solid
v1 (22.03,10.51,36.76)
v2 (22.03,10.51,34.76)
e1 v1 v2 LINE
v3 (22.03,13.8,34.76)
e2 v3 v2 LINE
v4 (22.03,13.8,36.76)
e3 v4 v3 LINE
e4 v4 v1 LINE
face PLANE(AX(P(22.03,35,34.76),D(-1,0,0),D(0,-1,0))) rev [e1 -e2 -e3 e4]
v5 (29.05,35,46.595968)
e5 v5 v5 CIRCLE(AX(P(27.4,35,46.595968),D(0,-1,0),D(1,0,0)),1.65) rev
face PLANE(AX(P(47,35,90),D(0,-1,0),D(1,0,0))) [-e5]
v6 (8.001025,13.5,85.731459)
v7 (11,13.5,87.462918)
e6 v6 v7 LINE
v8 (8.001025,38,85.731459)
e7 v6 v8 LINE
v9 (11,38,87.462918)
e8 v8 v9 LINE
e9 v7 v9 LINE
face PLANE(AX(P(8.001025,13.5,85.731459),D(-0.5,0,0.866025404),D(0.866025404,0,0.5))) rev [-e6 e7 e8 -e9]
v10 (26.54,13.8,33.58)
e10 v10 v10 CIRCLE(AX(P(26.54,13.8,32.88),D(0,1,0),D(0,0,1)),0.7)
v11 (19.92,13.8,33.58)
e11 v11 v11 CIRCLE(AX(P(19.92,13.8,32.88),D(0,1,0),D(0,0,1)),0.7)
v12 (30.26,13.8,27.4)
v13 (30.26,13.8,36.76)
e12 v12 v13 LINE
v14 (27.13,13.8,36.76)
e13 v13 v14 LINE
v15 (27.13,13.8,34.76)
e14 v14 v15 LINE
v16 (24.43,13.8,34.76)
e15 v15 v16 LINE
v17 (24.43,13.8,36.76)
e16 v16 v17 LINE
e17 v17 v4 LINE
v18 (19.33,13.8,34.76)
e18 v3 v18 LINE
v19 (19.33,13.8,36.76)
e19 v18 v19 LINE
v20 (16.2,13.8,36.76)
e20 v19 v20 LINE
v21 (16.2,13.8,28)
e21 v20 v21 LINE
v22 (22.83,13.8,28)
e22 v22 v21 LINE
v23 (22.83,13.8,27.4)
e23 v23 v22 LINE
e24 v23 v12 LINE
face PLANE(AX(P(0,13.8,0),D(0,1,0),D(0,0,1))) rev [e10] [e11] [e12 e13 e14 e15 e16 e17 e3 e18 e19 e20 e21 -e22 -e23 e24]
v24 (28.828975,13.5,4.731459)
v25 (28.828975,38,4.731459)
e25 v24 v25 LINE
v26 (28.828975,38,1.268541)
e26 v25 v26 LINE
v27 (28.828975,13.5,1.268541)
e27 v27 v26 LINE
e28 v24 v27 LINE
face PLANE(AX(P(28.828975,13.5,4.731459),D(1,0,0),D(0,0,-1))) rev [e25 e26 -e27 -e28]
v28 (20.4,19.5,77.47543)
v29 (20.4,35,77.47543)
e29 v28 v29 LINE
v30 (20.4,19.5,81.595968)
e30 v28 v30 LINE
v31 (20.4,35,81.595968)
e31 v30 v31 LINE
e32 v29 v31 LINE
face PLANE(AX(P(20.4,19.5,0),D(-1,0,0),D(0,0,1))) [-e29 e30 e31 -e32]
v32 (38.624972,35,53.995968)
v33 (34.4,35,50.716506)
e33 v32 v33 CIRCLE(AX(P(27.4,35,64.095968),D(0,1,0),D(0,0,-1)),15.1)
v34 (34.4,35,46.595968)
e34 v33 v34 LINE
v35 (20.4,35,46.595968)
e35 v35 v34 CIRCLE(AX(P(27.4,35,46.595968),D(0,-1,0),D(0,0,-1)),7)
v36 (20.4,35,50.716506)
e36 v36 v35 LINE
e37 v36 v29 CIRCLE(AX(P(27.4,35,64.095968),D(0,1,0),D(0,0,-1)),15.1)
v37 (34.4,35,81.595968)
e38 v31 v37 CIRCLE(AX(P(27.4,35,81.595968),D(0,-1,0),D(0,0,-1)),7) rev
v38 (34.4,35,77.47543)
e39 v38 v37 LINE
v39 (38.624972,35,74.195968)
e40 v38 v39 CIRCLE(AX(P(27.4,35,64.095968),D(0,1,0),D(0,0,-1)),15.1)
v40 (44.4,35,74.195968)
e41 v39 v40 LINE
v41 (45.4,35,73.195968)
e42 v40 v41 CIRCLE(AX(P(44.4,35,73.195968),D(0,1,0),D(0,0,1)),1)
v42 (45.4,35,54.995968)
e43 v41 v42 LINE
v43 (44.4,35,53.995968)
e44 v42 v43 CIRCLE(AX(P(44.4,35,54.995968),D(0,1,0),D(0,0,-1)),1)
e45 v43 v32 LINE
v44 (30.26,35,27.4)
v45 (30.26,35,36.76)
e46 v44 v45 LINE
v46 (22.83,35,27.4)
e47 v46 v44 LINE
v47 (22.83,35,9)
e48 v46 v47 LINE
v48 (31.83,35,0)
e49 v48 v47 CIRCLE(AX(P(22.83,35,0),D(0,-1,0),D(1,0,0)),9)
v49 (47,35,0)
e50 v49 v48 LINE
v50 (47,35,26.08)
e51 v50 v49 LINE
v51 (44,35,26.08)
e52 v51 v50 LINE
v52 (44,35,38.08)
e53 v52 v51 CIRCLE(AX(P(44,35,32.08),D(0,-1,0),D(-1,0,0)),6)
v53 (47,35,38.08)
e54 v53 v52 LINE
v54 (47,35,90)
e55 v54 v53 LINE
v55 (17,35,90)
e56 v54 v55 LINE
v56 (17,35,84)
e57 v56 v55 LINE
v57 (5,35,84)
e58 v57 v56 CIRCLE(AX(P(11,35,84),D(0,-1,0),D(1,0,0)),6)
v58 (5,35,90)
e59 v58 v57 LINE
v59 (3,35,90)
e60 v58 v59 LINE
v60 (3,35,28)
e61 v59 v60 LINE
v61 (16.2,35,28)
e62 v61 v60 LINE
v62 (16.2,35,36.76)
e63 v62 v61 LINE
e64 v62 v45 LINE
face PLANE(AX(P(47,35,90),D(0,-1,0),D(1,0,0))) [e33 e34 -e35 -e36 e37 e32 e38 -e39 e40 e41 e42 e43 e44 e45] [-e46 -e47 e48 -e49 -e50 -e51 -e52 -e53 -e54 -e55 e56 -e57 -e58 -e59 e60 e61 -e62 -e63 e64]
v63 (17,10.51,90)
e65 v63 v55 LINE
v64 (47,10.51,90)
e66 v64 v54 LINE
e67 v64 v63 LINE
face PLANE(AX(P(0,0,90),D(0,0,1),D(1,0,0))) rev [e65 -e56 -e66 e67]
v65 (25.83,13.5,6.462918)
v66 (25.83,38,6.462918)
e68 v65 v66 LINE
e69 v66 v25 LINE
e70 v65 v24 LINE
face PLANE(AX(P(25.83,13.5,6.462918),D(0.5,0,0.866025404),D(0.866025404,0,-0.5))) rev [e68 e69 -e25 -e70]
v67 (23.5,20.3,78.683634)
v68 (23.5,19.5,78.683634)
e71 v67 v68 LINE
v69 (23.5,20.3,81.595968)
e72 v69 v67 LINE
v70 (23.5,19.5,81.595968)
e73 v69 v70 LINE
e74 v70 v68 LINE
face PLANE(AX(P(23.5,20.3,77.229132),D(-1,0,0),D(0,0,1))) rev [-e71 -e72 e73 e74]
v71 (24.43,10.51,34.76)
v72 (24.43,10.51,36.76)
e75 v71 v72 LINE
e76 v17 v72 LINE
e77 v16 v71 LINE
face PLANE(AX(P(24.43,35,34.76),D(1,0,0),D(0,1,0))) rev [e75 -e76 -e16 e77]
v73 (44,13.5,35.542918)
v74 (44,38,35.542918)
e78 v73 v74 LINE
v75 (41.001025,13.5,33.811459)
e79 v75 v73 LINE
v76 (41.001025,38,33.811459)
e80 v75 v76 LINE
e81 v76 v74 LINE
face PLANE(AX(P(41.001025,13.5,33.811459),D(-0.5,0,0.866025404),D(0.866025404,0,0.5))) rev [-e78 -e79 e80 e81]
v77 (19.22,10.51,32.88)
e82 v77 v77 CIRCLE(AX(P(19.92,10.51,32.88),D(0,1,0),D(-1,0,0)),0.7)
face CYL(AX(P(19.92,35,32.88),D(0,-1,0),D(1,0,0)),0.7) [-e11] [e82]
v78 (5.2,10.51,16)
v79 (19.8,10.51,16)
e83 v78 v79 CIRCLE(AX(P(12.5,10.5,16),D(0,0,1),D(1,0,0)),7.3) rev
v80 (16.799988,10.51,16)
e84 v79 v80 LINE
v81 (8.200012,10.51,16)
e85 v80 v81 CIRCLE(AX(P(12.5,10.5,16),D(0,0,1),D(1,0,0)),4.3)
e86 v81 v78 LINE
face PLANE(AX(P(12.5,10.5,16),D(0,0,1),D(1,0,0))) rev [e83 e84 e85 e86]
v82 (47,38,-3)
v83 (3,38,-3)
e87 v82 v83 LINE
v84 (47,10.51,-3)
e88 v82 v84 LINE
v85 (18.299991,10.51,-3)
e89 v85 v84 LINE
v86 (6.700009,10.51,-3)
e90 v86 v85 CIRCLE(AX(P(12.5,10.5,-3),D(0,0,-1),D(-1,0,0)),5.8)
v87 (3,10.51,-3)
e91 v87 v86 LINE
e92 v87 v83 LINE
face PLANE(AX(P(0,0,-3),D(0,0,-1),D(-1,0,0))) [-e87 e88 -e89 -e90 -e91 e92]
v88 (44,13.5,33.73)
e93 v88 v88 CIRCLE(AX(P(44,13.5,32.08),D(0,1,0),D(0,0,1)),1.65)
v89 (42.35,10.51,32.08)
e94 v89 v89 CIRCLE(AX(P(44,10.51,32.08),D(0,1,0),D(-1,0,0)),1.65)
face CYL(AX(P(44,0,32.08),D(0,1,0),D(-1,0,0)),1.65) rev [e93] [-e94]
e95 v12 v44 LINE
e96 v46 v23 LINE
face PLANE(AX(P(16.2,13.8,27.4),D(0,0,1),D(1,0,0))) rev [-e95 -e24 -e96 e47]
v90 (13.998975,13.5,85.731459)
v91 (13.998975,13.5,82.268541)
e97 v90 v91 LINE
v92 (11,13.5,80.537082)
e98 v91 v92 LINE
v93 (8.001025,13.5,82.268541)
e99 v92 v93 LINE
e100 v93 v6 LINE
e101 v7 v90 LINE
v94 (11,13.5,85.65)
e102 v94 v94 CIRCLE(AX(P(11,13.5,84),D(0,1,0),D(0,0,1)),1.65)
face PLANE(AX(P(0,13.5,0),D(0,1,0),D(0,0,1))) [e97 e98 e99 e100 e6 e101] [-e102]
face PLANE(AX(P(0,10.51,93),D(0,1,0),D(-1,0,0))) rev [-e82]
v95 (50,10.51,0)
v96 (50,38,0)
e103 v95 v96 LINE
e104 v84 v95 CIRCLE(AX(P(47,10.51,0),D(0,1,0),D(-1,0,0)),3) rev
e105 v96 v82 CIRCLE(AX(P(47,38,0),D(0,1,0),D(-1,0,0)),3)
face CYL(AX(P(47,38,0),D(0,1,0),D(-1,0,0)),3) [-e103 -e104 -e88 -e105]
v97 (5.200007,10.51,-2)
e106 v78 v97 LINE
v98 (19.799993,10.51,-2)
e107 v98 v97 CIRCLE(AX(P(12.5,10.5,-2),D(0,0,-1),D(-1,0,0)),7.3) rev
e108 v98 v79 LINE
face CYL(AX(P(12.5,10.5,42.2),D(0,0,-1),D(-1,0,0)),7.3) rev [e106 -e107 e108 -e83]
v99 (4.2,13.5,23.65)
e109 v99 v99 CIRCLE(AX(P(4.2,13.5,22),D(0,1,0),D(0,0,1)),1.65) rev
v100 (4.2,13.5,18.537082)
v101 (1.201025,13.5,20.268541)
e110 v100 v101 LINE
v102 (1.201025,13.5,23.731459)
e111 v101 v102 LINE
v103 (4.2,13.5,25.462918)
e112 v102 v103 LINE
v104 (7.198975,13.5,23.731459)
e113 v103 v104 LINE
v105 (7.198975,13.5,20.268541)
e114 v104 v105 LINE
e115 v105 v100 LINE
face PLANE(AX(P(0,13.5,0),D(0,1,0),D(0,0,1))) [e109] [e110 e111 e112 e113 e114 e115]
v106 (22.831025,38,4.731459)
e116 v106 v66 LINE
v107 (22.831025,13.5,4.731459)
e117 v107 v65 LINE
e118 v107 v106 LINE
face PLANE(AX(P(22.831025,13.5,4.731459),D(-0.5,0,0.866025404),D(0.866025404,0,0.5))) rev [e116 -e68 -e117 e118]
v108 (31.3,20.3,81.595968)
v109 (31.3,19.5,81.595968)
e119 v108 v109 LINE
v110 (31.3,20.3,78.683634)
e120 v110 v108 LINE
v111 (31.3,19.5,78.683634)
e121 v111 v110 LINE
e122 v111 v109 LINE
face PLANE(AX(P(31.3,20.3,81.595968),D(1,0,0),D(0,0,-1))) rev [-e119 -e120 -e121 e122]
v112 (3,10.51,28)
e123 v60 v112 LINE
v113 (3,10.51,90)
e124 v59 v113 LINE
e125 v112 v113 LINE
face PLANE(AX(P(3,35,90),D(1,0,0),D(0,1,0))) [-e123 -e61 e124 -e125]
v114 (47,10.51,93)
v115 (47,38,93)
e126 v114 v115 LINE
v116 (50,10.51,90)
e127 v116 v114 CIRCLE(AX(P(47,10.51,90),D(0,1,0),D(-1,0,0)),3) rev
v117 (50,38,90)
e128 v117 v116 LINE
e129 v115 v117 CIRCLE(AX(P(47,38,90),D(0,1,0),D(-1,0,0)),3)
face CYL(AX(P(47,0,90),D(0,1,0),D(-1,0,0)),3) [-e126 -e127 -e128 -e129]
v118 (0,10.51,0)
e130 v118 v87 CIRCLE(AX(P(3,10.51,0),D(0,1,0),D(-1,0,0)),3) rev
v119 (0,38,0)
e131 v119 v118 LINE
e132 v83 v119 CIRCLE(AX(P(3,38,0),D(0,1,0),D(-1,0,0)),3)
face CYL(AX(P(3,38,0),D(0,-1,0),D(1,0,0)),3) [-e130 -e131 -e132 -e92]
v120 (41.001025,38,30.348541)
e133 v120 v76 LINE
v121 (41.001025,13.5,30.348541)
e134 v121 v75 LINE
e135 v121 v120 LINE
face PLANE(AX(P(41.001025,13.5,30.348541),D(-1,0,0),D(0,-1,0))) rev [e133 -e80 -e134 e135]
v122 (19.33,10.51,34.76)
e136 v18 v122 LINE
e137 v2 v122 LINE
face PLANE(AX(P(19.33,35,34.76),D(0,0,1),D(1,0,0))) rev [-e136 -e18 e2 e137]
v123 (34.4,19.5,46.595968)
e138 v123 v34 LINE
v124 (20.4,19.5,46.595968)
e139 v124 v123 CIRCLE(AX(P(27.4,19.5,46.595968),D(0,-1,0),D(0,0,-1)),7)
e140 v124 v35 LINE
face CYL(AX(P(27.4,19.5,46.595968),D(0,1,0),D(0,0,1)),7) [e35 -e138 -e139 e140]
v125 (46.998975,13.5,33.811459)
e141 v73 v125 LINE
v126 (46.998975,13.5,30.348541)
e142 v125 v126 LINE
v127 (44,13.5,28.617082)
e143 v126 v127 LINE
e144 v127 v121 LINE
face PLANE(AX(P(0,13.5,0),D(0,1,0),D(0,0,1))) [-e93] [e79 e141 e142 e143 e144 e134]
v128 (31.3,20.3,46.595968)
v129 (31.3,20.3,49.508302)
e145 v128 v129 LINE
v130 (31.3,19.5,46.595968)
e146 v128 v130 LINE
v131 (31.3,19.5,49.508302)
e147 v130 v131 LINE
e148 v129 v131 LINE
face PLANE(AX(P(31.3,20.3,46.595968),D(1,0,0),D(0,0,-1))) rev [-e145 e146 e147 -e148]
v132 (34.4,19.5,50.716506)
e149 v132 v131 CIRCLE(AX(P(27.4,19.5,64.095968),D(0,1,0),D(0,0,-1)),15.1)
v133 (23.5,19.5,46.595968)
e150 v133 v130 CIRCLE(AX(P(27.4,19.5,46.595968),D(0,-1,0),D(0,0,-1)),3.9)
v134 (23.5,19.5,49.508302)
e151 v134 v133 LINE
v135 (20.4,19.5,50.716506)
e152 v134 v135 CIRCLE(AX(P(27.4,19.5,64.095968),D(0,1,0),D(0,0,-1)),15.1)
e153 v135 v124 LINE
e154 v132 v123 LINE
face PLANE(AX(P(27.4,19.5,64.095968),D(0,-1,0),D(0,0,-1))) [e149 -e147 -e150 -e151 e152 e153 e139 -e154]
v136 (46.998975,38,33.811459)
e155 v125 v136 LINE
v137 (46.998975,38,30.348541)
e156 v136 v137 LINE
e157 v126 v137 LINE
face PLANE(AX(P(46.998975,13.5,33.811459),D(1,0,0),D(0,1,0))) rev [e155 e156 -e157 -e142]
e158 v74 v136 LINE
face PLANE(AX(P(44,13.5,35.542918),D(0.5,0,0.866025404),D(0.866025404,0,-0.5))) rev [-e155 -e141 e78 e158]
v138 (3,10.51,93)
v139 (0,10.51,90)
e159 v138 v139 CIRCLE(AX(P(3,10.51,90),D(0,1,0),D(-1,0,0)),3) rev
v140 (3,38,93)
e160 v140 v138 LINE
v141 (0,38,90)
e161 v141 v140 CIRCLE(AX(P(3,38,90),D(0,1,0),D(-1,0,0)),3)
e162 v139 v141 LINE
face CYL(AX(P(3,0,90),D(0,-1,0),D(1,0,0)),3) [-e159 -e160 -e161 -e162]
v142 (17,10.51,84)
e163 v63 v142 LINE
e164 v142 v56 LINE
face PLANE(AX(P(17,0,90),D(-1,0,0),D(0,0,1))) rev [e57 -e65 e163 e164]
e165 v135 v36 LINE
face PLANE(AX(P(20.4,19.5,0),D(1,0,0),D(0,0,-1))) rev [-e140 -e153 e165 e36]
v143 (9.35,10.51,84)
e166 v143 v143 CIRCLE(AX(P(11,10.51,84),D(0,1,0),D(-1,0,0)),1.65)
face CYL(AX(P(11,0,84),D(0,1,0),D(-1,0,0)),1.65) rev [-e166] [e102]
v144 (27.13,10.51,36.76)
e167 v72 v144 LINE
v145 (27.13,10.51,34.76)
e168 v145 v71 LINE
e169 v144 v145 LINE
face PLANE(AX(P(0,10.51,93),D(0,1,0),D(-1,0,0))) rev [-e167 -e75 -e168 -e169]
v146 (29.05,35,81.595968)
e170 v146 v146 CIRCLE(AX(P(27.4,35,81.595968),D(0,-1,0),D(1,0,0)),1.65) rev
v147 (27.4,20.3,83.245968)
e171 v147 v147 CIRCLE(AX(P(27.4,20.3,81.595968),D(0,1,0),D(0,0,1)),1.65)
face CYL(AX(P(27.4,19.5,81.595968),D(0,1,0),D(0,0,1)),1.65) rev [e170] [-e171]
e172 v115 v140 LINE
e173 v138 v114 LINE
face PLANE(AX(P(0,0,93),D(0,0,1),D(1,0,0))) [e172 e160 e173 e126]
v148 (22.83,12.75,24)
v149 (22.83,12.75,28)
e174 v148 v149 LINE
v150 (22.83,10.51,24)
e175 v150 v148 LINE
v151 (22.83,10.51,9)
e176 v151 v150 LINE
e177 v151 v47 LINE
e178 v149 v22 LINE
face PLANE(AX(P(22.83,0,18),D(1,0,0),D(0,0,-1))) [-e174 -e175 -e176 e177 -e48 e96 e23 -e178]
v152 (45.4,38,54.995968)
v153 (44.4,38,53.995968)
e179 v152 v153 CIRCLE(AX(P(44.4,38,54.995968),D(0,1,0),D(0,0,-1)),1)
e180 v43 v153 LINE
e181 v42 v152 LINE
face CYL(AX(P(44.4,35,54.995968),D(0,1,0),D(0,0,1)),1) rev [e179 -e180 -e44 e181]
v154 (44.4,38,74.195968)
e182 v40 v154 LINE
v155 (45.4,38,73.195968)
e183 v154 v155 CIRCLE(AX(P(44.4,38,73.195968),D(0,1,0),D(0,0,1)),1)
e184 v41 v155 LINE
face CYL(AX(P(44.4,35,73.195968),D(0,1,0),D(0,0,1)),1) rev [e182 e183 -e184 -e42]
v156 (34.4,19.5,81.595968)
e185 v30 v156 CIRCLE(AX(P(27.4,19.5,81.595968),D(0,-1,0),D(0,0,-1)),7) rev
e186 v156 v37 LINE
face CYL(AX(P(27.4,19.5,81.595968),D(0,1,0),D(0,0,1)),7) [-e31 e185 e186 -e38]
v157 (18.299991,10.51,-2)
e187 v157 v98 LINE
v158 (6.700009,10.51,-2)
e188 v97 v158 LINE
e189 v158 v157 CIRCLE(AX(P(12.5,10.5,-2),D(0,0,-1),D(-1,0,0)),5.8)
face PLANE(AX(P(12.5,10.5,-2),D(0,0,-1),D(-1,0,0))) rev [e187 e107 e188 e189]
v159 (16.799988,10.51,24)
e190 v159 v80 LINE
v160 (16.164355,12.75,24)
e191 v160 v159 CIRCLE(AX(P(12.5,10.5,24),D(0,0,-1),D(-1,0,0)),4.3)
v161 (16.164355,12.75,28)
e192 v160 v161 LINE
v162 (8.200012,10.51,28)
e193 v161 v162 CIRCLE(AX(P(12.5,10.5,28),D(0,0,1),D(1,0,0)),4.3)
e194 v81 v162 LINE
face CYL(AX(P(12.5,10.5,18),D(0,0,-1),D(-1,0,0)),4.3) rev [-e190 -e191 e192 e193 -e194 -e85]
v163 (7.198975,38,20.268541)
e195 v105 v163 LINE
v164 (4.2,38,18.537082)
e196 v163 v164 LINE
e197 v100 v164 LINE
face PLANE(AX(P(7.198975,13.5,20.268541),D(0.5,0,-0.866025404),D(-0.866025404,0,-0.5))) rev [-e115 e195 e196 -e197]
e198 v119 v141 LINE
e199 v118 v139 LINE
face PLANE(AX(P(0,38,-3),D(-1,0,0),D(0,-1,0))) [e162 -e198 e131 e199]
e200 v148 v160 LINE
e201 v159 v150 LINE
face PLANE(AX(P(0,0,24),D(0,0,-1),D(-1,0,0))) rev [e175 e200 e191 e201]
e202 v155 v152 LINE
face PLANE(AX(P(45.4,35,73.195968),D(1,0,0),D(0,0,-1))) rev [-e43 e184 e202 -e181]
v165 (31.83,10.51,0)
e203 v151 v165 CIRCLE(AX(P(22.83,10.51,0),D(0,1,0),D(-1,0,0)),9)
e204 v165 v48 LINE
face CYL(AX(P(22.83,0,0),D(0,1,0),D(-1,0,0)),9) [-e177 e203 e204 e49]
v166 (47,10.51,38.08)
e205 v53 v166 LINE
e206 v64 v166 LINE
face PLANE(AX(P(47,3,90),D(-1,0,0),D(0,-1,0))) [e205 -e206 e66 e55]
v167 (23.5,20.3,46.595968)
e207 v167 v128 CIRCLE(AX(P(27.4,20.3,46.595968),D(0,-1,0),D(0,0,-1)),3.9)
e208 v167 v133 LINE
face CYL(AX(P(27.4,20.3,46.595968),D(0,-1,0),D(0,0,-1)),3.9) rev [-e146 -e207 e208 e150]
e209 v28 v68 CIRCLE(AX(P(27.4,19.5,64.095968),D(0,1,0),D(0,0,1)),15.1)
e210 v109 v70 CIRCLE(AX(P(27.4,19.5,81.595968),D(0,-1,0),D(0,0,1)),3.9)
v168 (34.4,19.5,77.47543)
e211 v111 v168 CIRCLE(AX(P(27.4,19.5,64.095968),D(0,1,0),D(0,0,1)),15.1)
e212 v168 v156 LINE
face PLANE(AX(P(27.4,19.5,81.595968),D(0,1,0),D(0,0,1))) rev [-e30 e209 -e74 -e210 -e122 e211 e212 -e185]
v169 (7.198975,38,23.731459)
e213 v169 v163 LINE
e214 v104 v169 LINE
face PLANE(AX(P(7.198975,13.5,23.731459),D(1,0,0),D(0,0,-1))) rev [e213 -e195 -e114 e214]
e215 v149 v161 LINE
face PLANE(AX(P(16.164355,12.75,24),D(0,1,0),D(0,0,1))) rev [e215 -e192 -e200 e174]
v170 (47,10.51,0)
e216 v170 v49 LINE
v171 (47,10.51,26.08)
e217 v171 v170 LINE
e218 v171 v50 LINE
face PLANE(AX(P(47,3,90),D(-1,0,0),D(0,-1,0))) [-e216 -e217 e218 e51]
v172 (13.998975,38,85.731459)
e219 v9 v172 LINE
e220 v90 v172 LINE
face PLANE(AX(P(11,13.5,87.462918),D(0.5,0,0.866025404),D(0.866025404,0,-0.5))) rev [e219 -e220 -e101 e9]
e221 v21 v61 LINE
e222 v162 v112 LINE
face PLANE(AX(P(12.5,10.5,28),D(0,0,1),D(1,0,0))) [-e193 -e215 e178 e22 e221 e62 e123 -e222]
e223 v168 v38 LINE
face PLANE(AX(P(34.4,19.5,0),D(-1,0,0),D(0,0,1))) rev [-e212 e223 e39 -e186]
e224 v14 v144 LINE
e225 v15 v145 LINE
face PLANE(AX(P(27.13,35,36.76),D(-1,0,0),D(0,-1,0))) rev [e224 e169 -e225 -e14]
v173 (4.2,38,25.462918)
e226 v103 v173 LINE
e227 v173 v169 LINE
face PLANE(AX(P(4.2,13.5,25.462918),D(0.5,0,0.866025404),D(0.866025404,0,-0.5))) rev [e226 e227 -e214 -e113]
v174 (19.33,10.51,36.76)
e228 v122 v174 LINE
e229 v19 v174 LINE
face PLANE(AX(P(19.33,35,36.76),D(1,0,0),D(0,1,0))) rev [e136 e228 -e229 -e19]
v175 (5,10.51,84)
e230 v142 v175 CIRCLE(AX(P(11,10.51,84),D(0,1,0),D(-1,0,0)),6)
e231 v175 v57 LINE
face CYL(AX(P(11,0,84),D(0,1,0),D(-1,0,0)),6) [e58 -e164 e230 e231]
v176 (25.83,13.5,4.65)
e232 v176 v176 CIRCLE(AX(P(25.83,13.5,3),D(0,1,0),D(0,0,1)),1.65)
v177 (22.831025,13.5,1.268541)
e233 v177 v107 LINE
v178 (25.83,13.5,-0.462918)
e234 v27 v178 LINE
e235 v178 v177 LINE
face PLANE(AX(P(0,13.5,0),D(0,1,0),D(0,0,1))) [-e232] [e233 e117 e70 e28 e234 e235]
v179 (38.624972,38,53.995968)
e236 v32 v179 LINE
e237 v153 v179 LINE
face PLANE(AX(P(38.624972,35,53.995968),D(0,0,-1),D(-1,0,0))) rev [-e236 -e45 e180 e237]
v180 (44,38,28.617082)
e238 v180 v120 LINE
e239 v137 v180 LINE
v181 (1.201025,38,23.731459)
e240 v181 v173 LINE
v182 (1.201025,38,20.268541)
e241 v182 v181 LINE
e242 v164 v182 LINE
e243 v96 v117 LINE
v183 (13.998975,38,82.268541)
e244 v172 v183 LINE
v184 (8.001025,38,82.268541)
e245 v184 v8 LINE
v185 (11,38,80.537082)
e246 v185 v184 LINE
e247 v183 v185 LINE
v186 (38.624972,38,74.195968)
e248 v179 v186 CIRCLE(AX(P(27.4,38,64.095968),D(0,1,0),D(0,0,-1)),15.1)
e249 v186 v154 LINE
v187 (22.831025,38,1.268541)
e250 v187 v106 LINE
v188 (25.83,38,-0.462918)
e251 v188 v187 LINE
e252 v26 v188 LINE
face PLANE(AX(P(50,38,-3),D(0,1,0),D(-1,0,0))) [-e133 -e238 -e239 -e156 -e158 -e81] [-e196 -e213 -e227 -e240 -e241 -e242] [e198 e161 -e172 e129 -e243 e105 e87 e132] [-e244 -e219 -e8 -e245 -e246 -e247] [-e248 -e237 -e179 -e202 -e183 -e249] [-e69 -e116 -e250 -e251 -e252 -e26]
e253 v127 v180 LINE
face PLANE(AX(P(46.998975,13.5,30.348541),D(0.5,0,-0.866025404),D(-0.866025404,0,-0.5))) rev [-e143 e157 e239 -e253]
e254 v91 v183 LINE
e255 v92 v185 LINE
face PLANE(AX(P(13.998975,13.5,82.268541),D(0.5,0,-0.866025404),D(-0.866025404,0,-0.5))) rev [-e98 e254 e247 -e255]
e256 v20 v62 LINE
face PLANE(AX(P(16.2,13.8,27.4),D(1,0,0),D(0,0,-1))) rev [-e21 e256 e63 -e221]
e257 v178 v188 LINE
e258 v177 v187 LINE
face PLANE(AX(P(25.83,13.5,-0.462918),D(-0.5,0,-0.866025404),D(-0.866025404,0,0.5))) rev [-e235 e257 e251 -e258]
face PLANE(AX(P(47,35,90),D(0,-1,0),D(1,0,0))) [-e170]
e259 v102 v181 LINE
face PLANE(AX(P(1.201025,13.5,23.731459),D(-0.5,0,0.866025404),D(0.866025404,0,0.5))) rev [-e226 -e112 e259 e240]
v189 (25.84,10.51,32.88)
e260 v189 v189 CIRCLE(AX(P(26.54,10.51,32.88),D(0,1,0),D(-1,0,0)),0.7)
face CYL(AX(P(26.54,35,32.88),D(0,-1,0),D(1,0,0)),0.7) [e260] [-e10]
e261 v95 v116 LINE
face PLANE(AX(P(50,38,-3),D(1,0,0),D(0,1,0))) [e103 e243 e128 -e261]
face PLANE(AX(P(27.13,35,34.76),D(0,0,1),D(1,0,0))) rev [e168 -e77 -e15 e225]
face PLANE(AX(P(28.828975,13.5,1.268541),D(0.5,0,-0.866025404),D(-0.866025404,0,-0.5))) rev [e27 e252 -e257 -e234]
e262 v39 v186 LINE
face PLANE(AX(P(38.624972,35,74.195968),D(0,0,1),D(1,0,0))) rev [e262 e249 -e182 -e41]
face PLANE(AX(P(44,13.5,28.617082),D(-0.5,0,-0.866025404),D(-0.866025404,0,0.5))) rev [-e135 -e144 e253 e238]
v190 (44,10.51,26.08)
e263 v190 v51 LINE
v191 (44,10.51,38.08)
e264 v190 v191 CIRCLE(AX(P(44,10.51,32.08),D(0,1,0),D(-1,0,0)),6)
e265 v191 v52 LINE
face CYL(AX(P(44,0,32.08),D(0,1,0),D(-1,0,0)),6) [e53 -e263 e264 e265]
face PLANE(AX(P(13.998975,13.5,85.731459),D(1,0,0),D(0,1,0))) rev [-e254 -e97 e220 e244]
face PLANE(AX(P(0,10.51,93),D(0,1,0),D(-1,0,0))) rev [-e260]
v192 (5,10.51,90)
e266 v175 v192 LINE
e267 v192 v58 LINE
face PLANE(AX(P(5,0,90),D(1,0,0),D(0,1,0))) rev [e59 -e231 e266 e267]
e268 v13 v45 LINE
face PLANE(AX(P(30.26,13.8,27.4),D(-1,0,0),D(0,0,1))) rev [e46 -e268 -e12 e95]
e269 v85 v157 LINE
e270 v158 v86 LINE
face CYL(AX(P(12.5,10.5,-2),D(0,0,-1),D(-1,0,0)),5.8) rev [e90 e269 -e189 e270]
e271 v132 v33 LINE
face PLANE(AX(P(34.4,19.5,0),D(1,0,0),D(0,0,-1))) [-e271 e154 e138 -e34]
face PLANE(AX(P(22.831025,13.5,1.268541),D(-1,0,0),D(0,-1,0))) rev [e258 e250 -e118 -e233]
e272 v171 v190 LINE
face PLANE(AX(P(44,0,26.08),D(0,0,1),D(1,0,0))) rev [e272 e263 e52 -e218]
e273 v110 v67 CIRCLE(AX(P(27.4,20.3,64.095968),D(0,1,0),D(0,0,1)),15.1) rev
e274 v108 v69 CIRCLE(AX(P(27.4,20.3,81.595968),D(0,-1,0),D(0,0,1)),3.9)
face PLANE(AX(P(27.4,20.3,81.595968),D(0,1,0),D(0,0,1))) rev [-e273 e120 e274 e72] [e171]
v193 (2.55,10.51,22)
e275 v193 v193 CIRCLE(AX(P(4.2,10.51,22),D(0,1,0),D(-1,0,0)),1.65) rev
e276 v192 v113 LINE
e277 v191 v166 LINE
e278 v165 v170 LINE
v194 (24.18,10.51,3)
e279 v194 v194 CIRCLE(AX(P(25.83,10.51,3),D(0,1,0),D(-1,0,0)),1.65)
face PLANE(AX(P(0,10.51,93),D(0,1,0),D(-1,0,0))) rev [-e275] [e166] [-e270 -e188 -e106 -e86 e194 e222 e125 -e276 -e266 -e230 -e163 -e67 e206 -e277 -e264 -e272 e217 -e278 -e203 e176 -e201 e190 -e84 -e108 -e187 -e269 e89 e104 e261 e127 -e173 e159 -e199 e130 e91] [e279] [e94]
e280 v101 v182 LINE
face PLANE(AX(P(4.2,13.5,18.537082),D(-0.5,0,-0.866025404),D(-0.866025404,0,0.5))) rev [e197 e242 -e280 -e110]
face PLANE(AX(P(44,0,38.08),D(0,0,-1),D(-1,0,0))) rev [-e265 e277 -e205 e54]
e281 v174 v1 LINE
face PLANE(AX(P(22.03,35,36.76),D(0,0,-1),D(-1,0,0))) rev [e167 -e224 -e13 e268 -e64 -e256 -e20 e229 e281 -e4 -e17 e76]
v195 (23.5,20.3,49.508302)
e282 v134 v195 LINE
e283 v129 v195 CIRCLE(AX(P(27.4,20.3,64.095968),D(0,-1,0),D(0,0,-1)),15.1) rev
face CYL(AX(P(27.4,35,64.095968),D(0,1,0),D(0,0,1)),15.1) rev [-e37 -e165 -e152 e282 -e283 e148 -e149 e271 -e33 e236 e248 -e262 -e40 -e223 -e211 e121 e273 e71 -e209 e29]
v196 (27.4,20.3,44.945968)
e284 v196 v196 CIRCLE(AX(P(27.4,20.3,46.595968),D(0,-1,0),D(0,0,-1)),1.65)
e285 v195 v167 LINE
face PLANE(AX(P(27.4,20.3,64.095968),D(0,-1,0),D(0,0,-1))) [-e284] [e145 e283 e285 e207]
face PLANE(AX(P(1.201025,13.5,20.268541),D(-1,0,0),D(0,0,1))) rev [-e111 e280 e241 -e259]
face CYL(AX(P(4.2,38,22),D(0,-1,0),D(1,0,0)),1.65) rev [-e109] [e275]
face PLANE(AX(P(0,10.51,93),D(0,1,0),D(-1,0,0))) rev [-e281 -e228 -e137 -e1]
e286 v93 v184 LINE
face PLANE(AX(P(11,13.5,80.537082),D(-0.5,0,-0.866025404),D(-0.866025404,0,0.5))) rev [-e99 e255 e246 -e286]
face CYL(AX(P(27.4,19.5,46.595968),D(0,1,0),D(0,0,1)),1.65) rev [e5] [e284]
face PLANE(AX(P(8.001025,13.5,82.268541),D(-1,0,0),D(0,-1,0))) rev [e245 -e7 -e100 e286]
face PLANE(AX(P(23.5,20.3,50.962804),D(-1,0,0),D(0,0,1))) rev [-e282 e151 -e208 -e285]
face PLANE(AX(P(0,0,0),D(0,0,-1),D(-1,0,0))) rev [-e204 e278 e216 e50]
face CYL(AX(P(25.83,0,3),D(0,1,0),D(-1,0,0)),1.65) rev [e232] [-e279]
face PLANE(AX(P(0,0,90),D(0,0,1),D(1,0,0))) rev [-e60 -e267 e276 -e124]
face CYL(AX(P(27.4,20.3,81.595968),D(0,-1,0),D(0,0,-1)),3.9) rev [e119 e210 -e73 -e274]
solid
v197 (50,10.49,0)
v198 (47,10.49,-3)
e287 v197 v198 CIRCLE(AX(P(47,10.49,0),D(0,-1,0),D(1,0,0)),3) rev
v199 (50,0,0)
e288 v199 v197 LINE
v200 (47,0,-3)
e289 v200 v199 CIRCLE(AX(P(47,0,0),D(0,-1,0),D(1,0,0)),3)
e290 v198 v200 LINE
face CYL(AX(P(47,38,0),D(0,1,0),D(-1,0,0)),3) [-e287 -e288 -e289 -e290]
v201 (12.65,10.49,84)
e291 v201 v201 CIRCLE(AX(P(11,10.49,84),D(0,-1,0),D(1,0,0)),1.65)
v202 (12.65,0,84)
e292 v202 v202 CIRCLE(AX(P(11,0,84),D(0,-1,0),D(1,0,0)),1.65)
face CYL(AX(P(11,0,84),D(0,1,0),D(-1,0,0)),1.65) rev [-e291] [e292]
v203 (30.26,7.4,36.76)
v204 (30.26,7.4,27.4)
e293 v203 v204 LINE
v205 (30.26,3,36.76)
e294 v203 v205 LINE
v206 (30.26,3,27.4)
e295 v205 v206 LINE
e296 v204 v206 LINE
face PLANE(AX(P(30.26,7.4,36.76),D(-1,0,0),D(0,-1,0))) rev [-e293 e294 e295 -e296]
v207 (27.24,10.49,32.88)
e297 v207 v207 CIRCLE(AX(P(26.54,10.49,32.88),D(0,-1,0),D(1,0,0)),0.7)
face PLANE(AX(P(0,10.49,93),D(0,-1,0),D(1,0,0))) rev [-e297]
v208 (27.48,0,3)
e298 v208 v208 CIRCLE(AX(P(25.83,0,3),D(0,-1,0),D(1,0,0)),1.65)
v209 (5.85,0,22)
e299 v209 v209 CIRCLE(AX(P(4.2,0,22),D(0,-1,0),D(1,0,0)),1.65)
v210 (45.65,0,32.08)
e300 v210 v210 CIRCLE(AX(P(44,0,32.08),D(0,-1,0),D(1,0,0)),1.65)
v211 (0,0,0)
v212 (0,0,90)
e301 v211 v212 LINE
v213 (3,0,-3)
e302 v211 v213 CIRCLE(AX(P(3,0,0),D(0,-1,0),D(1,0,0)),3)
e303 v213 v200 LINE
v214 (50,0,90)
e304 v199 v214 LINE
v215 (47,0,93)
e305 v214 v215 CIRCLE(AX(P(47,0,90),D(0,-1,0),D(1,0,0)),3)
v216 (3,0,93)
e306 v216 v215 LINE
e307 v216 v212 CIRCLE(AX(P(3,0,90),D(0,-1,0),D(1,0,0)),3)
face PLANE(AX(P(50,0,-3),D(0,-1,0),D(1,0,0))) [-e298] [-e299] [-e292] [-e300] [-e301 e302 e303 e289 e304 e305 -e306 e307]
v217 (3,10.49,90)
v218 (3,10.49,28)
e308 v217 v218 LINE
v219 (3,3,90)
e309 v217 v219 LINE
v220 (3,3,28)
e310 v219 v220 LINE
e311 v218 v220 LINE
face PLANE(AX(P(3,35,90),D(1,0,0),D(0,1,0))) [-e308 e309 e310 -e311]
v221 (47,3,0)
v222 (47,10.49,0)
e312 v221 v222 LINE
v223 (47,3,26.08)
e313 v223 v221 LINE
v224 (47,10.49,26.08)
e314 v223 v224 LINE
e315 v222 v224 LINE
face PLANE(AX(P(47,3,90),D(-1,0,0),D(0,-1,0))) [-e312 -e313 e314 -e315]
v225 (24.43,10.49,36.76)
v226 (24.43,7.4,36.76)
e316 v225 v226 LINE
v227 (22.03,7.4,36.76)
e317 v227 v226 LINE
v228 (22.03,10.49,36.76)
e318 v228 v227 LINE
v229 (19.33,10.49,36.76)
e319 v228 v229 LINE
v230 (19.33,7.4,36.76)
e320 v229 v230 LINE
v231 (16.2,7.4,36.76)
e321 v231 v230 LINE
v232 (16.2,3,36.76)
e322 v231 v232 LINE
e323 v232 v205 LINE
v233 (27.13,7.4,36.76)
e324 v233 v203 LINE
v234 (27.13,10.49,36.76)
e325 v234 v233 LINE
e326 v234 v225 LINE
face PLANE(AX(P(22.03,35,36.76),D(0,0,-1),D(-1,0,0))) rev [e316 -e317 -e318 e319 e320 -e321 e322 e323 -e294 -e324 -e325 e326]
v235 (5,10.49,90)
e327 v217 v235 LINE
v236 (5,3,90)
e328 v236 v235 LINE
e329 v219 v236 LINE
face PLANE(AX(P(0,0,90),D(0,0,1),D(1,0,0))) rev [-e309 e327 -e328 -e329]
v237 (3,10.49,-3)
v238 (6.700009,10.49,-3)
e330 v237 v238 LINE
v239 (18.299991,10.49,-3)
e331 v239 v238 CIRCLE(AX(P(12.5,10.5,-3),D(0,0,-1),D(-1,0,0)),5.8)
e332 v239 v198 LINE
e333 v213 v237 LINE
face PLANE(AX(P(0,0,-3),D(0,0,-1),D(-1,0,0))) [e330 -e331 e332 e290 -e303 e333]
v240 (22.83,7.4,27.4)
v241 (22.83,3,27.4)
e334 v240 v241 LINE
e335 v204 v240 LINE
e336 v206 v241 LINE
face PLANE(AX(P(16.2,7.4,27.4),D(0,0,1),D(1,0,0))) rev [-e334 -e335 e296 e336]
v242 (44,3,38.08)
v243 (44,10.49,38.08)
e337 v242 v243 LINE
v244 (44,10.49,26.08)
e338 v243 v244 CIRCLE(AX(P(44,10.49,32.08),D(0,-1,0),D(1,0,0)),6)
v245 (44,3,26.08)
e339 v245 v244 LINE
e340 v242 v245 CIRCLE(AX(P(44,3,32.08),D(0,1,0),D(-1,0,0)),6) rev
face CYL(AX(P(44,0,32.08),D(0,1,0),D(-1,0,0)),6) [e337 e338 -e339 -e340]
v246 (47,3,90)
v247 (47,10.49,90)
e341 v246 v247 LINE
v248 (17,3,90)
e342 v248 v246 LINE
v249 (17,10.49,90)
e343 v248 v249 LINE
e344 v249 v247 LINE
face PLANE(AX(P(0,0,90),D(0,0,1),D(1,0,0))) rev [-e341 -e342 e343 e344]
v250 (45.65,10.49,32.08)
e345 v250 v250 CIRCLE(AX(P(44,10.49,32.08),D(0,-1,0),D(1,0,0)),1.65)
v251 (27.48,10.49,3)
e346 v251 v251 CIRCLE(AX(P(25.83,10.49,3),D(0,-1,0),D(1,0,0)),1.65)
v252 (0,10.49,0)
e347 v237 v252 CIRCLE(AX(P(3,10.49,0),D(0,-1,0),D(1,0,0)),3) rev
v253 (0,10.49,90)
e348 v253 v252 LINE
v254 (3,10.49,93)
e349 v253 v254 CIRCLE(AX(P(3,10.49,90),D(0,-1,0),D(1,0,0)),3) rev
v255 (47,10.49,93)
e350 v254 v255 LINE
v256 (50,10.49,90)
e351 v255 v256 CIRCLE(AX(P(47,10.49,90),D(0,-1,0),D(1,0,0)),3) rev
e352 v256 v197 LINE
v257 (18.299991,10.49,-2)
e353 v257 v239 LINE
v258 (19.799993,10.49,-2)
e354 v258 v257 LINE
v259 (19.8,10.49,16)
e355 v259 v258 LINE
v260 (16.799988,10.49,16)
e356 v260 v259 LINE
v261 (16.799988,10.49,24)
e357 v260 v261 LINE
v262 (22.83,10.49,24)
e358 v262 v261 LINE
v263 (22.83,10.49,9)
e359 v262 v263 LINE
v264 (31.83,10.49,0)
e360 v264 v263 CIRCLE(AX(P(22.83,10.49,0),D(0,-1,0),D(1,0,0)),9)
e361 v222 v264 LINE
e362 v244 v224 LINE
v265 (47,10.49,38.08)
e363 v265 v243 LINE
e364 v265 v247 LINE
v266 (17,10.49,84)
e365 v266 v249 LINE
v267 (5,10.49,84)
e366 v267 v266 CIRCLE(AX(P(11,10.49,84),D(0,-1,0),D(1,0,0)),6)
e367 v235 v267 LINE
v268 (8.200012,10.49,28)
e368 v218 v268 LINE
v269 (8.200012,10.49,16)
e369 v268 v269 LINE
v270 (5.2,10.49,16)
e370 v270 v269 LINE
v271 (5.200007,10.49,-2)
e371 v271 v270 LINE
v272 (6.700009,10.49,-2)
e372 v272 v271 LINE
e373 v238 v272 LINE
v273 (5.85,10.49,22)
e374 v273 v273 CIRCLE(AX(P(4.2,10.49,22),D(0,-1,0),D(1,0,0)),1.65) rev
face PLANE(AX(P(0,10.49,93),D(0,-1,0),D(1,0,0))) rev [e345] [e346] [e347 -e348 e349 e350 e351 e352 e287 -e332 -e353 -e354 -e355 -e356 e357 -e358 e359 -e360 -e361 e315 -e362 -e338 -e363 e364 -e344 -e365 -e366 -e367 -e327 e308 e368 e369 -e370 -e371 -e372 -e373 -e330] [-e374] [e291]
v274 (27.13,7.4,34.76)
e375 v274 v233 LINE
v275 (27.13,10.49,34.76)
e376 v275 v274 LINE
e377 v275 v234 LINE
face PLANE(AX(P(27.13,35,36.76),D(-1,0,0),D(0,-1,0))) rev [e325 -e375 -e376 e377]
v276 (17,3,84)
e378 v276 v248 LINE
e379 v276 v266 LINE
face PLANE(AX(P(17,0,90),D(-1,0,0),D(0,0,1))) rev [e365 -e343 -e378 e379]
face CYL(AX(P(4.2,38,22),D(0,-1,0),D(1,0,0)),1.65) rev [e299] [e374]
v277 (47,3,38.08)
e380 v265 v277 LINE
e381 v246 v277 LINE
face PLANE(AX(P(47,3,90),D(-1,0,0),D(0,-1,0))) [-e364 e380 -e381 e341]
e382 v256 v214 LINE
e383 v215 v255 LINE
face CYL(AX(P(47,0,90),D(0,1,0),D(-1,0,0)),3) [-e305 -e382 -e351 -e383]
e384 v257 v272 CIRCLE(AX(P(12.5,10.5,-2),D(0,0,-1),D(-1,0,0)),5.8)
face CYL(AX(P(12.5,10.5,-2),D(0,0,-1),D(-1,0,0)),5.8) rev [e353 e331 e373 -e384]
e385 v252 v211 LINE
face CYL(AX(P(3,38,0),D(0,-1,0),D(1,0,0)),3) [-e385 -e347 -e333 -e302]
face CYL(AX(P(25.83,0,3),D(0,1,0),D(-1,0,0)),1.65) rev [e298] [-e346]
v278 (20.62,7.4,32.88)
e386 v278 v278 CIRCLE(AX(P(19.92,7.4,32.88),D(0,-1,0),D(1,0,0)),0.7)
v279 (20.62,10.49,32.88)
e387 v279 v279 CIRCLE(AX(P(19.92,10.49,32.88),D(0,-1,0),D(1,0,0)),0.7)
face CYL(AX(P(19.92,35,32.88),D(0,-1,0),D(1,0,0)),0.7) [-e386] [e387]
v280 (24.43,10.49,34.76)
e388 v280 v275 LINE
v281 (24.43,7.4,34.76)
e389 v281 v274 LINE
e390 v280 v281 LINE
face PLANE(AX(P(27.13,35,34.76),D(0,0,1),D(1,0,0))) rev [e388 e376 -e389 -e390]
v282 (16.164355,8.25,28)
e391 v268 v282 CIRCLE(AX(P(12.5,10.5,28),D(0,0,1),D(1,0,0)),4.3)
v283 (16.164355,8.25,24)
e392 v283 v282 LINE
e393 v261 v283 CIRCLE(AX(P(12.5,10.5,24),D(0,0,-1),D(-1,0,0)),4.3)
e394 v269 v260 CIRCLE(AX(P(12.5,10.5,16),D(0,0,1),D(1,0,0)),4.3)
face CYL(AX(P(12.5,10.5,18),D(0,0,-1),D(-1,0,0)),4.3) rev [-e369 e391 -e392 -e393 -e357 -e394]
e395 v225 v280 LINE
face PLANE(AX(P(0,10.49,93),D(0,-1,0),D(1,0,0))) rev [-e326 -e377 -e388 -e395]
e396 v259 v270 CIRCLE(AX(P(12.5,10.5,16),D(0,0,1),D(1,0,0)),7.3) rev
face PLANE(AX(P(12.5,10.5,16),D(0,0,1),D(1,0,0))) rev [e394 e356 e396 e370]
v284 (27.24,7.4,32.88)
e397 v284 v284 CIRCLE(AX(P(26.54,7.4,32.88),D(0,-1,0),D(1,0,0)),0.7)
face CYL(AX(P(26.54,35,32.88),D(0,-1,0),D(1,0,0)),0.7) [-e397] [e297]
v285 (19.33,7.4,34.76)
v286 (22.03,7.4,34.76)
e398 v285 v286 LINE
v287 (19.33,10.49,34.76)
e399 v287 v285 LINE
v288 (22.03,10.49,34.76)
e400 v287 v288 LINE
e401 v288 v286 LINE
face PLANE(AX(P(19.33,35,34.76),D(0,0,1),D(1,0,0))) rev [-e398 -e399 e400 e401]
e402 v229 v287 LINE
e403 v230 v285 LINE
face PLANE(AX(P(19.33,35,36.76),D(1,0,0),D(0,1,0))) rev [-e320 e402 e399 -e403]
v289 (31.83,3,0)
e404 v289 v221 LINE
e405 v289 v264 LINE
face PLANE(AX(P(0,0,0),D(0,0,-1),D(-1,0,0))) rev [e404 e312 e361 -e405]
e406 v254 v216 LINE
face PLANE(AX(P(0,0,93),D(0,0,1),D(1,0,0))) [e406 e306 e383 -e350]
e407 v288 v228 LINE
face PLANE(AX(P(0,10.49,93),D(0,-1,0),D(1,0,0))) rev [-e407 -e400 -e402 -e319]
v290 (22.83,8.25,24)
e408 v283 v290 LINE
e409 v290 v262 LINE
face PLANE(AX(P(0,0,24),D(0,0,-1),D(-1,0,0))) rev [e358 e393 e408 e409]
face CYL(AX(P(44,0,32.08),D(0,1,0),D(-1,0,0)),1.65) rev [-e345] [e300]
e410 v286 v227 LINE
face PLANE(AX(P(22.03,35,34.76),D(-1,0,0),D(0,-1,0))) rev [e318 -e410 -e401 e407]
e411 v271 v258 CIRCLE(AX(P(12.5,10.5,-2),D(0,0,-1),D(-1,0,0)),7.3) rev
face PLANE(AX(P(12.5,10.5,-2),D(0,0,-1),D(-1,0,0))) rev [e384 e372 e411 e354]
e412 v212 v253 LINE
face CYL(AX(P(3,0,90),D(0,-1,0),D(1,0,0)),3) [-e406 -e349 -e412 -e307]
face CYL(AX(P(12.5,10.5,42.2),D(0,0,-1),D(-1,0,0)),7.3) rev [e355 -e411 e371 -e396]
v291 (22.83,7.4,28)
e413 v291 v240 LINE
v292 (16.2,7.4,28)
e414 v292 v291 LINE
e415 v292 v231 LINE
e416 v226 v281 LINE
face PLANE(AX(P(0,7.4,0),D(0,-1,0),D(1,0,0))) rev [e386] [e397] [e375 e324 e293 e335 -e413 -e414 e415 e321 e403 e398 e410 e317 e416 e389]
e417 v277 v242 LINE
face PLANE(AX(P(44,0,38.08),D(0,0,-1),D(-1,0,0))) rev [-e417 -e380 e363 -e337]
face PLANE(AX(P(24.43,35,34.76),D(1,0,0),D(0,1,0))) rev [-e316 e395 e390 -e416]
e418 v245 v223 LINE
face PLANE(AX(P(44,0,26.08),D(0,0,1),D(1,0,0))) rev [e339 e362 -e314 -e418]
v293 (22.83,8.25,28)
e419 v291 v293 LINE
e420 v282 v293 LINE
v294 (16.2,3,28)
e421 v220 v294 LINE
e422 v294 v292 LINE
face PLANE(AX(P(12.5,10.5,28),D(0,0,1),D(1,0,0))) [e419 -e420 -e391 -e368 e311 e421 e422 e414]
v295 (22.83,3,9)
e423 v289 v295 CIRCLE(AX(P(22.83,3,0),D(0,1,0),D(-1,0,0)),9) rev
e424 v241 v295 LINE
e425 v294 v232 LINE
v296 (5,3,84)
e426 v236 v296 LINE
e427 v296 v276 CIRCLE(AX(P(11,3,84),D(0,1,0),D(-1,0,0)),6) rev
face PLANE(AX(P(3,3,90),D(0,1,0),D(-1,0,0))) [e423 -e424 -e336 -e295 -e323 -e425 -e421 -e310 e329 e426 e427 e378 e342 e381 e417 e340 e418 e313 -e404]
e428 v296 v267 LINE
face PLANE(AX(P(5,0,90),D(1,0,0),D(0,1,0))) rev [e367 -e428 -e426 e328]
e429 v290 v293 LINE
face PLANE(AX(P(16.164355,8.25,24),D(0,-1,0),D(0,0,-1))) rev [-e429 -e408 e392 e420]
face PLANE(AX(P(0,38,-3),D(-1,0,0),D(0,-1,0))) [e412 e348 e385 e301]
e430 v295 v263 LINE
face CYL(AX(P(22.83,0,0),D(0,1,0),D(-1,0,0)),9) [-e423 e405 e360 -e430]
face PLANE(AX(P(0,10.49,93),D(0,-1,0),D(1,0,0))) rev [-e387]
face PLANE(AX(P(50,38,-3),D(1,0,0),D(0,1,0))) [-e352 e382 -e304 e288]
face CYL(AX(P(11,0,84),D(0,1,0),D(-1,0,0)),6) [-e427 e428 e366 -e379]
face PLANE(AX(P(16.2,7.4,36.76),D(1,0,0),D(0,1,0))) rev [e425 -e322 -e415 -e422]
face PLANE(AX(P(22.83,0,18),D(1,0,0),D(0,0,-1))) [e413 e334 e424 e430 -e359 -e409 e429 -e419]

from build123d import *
from build123d.topology import SkipClean

# Parameters (mm, degrees)
SKETCH_1_W               = 50
SKETCH_1_H               = 38
EXTRUDE_1_DEPTH          = 3
SKETCH_2_W               = 50
SKETCH_2_H               = 38
SKETCH_2_W_2             = 44
SKETCH_2_H_2             = 32
EXTRUDE_2_DEPTH          = 90
SKETCH_4_R               = 7.3
CUT_EXTRUDE_1_DEPTH      = 45.2
SKETCH_5_R               = 10.3
SKETCH_5_R_2             = 7.3
EXTRUDE_3_DEPTH          = 16
SKETCH_6_R               = 8.3
SKETCH_6_R_2             = 5.8
EXTRUDE_5_DEPTH          = 1
SKETCH_7_R               = 4.3
EXTRUDE_6_DEPTH          = 2
SKETCH_8_R               = 6.3
SKETCH_8_R_2             = 4.3
EXTRUDE_7_DEPTH          = 10
SKETCH_9_W               = 2.635644668
SKETCH_9_H               = 4.5
CUT_EXTRUDE_2_DEPTH      = 4
SKETCH_10_R              = 0.7
SKETCH_10_W              = 2.7
SKETCH_10_H              = 2
EXTRUDE_8_DEPTH          = 32
SKETCH_11_W              = 14.06
SKETCH_11_H              = 9.36
EXTRUDE_9_DEPTH          = 4.4
SKETCH_12_W              = 14.06
SKETCH_12_H              = 9.36
EXTRUDE_10_DEPTH         = 21.2
CUT_EXTRUDE_3_DEPTH      = 3
SKETCH_14_R              = 1.65
EXTRUDE_11_DEPTH         = 15.5
EXTRUDE_12_DEPTH         = 15.5
CUT_EXTRUDE_4_DEPTH      = 0.8
EXTRUDE_13_DEPTH         = 18
SKETCH_18_W              = 19.83
SKETCH_18_H              = 32
SKETCH_18_R              = 6.3
EXTRUDE_14_DEPTH         = 10
SKETCH_19_W              = 4.445486426
SKETCH_19_H              = 4.5
CUT_EXTRUDE_5_DEPTH      = 4
EXTRUDE_16_REACH         = 110.743
SKETCH_23_R              = 1.65
CUT_EXTRUDE_7_DEPTH      = 109.742815855
CUT_EXTRUDE_7_DEPTH_BACK = 109.742815855
SKETCH_25_R              = 1.65
CUT_EXTRUDE_8_DEPTH      = 24.5
SKETCH_29_W              = 50
SKETCH_29_H              = 38
EXTRUDE_17_DEPTH         = 3
FILLET_1_R               = 3
SKETCH_30_W              = 96
SKETCH_30_H              = 0.02
CUT_EXTRUDE_9_DEPTH      = 113.218536793


with BuildPart() as part:
    # 草图1 → 凸台-拉伸1 (new body)
    with BuildSketch(Plane.XY):
        with Locations((25, 19)):
            Rectangle(SKETCH_1_W, SKETCH_1_H)
    extrude(amount=-EXTRUDE_1_DEPTH)

    # 草图2 → 凸台-拉伸2 (add)
    with BuildSketch(Plane.XY):
        with Locations((25, 19)):
            Rectangle(SKETCH_2_W, SKETCH_2_H)
        with Locations((25, 19)):
            Rectangle(SKETCH_2_W_2, SKETCH_2_H_2, mode=Mode.SUBTRACT)
    extrude(amount=EXTRUDE_2_DEPTH)

    # 草图4 → 切除-拉伸1 (cut)
    with BuildSketch(Plane(origin=(0, 0, -3), x_dir=(-1, 0, 0), z_dir=(0, 0, -1))):
        with Locations((-12.5, 10.5)):
            Circle(SKETCH_4_R)
    extrude(amount=-CUT_EXTRUDE_1_DEPTH, mode=Mode.SUBTRACT)

    # 草图5 → 凸台-拉伸3 (add)
    with BuildSketch(Plane.XY):
        with Locations((12.5, 10.5)):
            Circle(SKETCH_5_R)
        with Locations(Location((12.5, 10.5, 0), (0, 0, 180))):
            Circle(SKETCH_5_R_2, mode=Mode.SUBTRACT)
    extrude(amount=EXTRUDE_3_DEPTH)

    # 草图6 → 凸台-拉伸5 (add)
    with BuildSketch(Plane(origin=(0, 0, -3), x_dir=(-1, 0, 0), z_dir=(0, 0, -1))):
        with Locations((-12.5, 10.5)):
            Circle(SKETCH_6_R)
        with Locations((-12.5, 10.5)):
            Circle(SKETCH_6_R_2, mode=Mode.SUBTRACT)
    extrude(amount=-EXTRUDE_5_DEPTH)

    # 草图7 → 凸台-拉伸6 (add)
    with BuildSketch(Plane.XY.offset(16)):
        with BuildLine():
            Line((5.440254962, 3), (19.559745038, 3))
            ThreePointArc((19.559745038, 3), (18.368221419, 18.964867239), (3, 14.479949748))
            Line((3, 14.479949748), (3, 6.520050252))
            ThreePointArc((3, 6.520050252), (4.035132761, 4.631778581), (5.440254962, 3))
        make_face()
        with Locations((12.5, 10.5)):
            Circle(SKETCH_7_R, mode=Mode.SUBTRACT)
    extrude(amount=EXTRUDE_6_DEPTH)

    # 草图8 → 凸台-拉伸7 (add)
    with BuildSketch(Plane.XY.offset(18)):
        with Locations((12.5, 10.5)):
            Circle(SKETCH_8_R)
        with Locations((12.5, 10.5)):
            Circle(SKETCH_8_R_2, mode=Mode.SUBTRACT)
    extrude(amount=EXTRUDE_7_DEPTH)

    # 草图9 → 切除-拉伸2 (cut)
    with BuildSketch(Plane.XY.offset(28)):
        with Locations((17.482177666, 10.5)):
            Rectangle(SKETCH_9_W, SKETCH_9_H)
    extrude(amount=-CUT_EXTRUDE_2_DEPTH, mode=Mode.SUBTRACT)

    # 草图10 → 凸台-拉伸8 (add)
    with BuildSketch(Plane(origin=(0, 3, 0), x_dir=(1, 0, 0), z_dir=(0, 1, 0))):
        with Locations(Location((19.92, -32.88, 0), (0, 0, 180))):
            Circle(SKETCH_10_R)
        with Locations(Location((26.54, -32.88, 0), (0, 0, 180))):
            Circle(SKETCH_10_R)
        with Locations((20.68, -35.76)):
            Rectangle(SKETCH_10_W, SKETCH_10_H)
        with Locations((25.78, -35.76)):
            Rectangle(SKETCH_10_W, SKETCH_10_H)
    extrude(amount=EXTRUDE_8_DEPTH)

    # 草图11 → 凸台-拉伸9 (add)
    with BuildSketch(Plane(origin=(0, 3, 0), x_dir=(1, 0, 0), z_dir=(0, 1, 0))):
        with Locations((23.23, -32.08)):
            Rectangle(SKETCH_11_W, SKETCH_11_H)
    extrude(amount=EXTRUDE_9_DEPTH)

    # 草图12 → 凸台-拉伸10 (add)
    with BuildSketch(Plane.XZ.offset(-35)):
        with Locations((23.23, 32.08)):
            Rectangle(SKETCH_12_W, SKETCH_12_H)
    extrude(amount=EXTRUDE_10_DEPTH)

    # 草图13 → 切除-拉伸3 (cut)
    with BuildSketch(Plane(origin=(0, 38, 0), x_dir=(1, 0, 0), z_dir=(0, 1, 0))):
        with BuildLine():
            Line((38.62497216, -74.195968058), (44.4, -74.195968058))
            ThreePointArc((44.4, -74.195968058), (45.107106781, -73.903074839), (45.4, -73.195968058))
            Line((45.4, -73.195968058), (45.4, -54.995968058))
            ThreePointArc((45.4, -54.995968058), (45.107106781, -54.288861277), (44.4, -53.995968058))
            Line((44.4, -53.995968058), (38.62497216, -53.995968058))
            ThreePointArc((38.62497216, -53.995968058), (12.3, -64.095968058), (38.62497216, -74.195968058))
        make_face()
    extrude(amount=-CUT_EXTRUDE_3_DEPTH, mode=Mode.SUBTRACT)

    # 草图14 → 凸台-拉伸11 (add)
    # profile 1 of 2: a face of its own
    with SkipClean():  # the faces are left unmerged after this step: merging them gives an invalid solid
        with BuildSketch(Plane.XZ.offset(-35)):
            with BuildLine():
                Line((23.9, 46.595968058), (23.9, 49.407196837))
                ThreePointArc((23.9, 49.407196837), (27.4, 48.995968058), (30.9, 49.407196837))
                Line((30.9, 49.407196837), (30.9, 46.595968058))
                ThreePointArc((30.9, 46.595968058), (27.4, 43.095968058), (23.9, 46.595968058))
            make_face()
            with Locations((27.4, 46.595968058)):
                Circle(SKETCH_14_R, mode=Mode.SUBTRACT)
        # profile 2 of 2: a face of its own
        with BuildSketch(Plane.XZ.offset(-35)):
            with BuildLine():
                Line((30.9, 81.595968058), (30.9, 78.78473928))
                ThreePointArc((30.9, 78.78473928), (27.4, 79.195968058), (23.9, 78.78473928))
                Line((23.9, 78.78473928), (23.9, 81.595968058))
                ThreePointArc((23.9, 81.595968058), (27.4, 85.095968058), (30.9, 81.595968058))
            make_face()
            with Locations(Location((27.4, 81.595968058, 0), (0, 0, 90))):
                Circle(SKETCH_14_R, mode=Mode.SUBTRACT)
        extrude(amount=EXTRUDE_11_DEPTH)

    # 草图15 → 凸台-拉伸12 (add)
    with SkipClean():  # the faces are left unmerged after this step: merging them gives an invalid solid
        with BuildSketch(Plane.XZ.offset(-35)):
            with BuildLine():
                ThreePointArc((23.9, 49.407196837), (22.109340992, 49.953163271), (20.4, 50.716506186))
                Line((20.4, 50.716506186), (20.4, 46.595968058))
                ThreePointArc((20.4, 46.595968058), (27.4, 39.595968058), (34.4, 46.595968058))
                Line((34.4, 46.595968058), (34.4, 50.716506186))
                ThreePointArc((34.4, 50.716506186), (32.690659008, 49.953163271), (30.9, 49.407196837))
                Line((30.9, 49.407196837), (30.9, 46.595968058))
                ThreePointArc((30.9, 46.595968058), (27.4, 43.095968058), (23.9, 46.595968058))
                Line((23.9, 46.595968058), (23.9, 49.407196837))
            make_face()
            with BuildLine():
                Line((20.4, 81.595968058), (20.4, 77.475429931))
                ThreePointArc((20.4, 77.475429931), (22.109340992, 78.238772846), (23.9, 78.78473928))
                Line((23.9, 78.78473928), (23.9, 81.595968058))
                ThreePointArc((23.9, 81.595968058), (27.4, 85.095968058), (30.9, 81.595968058))
                Line((30.9, 81.595968058), (30.9, 78.78473928))
                ThreePointArc((30.9, 78.78473928), (32.690659008, 78.238772846), (34.4, 77.475429931))
                Line((34.4, 77.475429931), (34.4, 81.595968058))
                ThreePointArc((34.4, 81.595968058), (27.4, 88.595968058), (20.4, 81.595968058))
            make_face()
        extrude(amount=EXTRUDE_12_DEPTH)

    # 草图16 → 切除-拉伸4 (cut)
    with SkipClean():  # the faces are left unmerged after this step: merging them gives an invalid solid
        with BuildSketch(Plane.XZ.offset(-19.5)):
            with BuildLine():
                Line((31.3, 81.595968058), (31.3, 77.229132186))
                ThreePointArc((31.3, 77.229132186), (27.4, 77.795968058), (23.5, 77.229132186))
                Line((23.5, 77.229132186), (23.5, 81.595968058))
                ThreePointArc((23.5, 81.595968058), (27.4, 85.495968058), (31.3, 81.595968058))
            make_face()
            with BuildLine():
                Line((31.3, 46.595968058), (31.3, 50.962803931))
                ThreePointArc((31.3, 50.962803931), (27.4, 50.395968058), (23.5, 50.962803931))
                Line((23.5, 50.962803931), (23.5, 46.595968058))
                ThreePointArc((23.5, 46.595968058), (27.4, 42.695968058), (31.3, 46.595968058))
            make_face()
        extrude(amount=-CUT_EXTRUDE_4_DEPTH, mode=Mode.SUBTRACT)

    # 草图17 → 凸台-拉伸13 (add)
    with SkipClean():  # the faces are left unmerged after this step: merging them gives an invalid solid
        with BuildSketch(Plane.XY):
            with BuildLine():
                Line((22.83, 3), (22.83, 10.539153682))
                Line((22.83, 10.539153682), (22.83, 35))
                Line((22.83, 35), (3, 35))
                Line((3, 35), (3, 14.479949748))
                ThreePointArc((3, 14.479949748), (18.368221419, 18.964867239), (19.559745038, 3))
                Line((19.559745038, 3), (22.83, 3))
            make_face()
            with BuildLine():
                Line((5.440254962, 3), (3, 3))
                Line((3, 3), (3, 6.520050252))
                ThreePointArc((3, 6.520050252), (4.035132761, 4.631778581), (5.440254962, 3))
            make_face()
        extrude(amount=EXTRUDE_13_DEPTH)

    # 草图18 → 凸台-拉伸14 (add)
    with SkipClean():  # the faces are left unmerged after this step: merging them gives an invalid solid
        with BuildSketch(Plane.XY.offset(18)):
            with Locations((12.915, 19)):
                Rectangle(SKETCH_18_W, SKETCH_18_H)
            with Locations((12.5, 10.5)):
                Circle(SKETCH_18_R, mode=Mode.SUBTRACT)
        extrude(amount=EXTRUDE_14_DEPTH)

    # 草图19 → 切除-拉伸5 (cut)
    with SkipClean():  # the faces are left unmerged after this step: merging them gives an invalid solid
        with BuildSketch(Plane.XY.offset(28)):
            with Locations((20.607256787, 10.5)):
                Rectangle(SKETCH_19_W, SKETCH_19_H)
        extrude(amount=-CUT_EXTRUDE_5_DEPTH, mode=Mode.SUBTRACT)

    # 草图23 → 凸台-拉伸16 (add, up to next)
    with BuildSketch(Plane.XZ.offset(-35), mode=Mode.PRIVATE) as extrude_16_sk1:
        with BuildLine():
            Line((22.83, 0), (22.83, 9))
            ThreePointArc((22.83, 9), (29.193961031, 6.363961031), (31.83, 0))
            Line((31.83, 0), (22.83, 0))
        make_face()
        with Locations(Location((25.83, 3, 0), (0, 0, 180))):
            Circle(SKETCH_23_R, mode=Mode.SUBTRACT)
    extrude_16_tool1 = extrude(extrude_16_sk1.sketch, amount=EXTRUDE_16_REACH, mode=Mode.PRIVATE) - part.part
    # 草图23 → 凸台-拉伸16 (add, up to next)
    with BuildSketch(Plane.XZ.offset(-35), mode=Mode.PRIVATE) as extrude_16_sk2:
        with BuildLine():
            Line((44, 26.08), (47, 26.08))
            Line((47, 26.08), (47, 38.08))
            Line((47, 38.08), (44, 38.08))
            ThreePointArc((44, 38.08), (38, 32.08), (44, 26.08))
        make_face()
        with Locations(Location((44, 32.08, 0), (0, 0, 180))):
            Circle(SKETCH_23_R, mode=Mode.SUBTRACT)
    extrude_16_tool2 = extrude(extrude_16_sk2.sketch, amount=EXTRUDE_16_REACH, mode=Mode.PRIVATE) - part.part
    # 草图23 → 凸台-拉伸16 (add, up to next)
    with BuildSketch(Plane.XZ.offset(-35), mode=Mode.PRIVATE) as extrude_16_sk3:
        with BuildLine():
            Line((5, 90), (5, 84))
            ThreePointArc((5, 84), (11, 78), (17, 84))
            Line((17, 84), (17, 90))
            Line((17, 90), (5, 90))
        make_face()
        with Locations(Location((11, 84, 0), (0, 0, 180))):
            Circle(SKETCH_23_R, mode=Mode.SUBTRACT)
    extrude_16_tool3 = extrude(extrude_16_sk3.sketch, amount=EXTRUDE_16_REACH, mode=Mode.PRIVATE) - part.part
    add(extrude_16_tool1.solids().sort_by_distance((27.33, 35, 0.127279))[0])
    add(extrude_16_tool2.solids().sort_by_distance((45.5, 35, 26.23))[0])
    add(extrude_16_tool3.solids().sort_by_distance((11, 35, 78.169706))[0])

    # 草图25 → 切除-拉伸7 (cut, two sides: drawn at the far end of the back side and taken through both)
    with BuildSketch(Plane.XZ.offset(-35).offset(-CUT_EXTRUDE_7_DEPTH_BACK)):
        with Locations((4.2, 22)):
            Circle(SKETCH_25_R)
        with Locations((25.83, 3)):
            Circle(SKETCH_25_R)
        with Locations((44, 32.08)):
            Circle(SKETCH_25_R)
        with Locations((11, 84)):
            Circle(SKETCH_25_R)
    extrude(amount=CUT_EXTRUDE_7_DEPTH + CUT_EXTRUDE_7_DEPTH_BACK, mode=Mode.SUBTRACT)

    # 草图26 → 切除-拉伸8 (cut)
    with SkipClean():  # the faces are left unmerged after this step: merging them gives an invalid solid
        with BuildSketch(Plane(origin=(0, 38, 0), x_dir=(1, 0, 0), z_dir=(0, 1, 0))):
            Polygon((4.2, -18.537081721), (1.201024799, -20.268540861), (1.201024799, -23.731459139), (4.2, -25.462918279), (7.198975201, -23.731459139), (7.198975201, -20.268540861), align=None)
            Polygon((25.83, -6.462918279), (28.828975201, -4.731459139), (28.828975201, -1.268540861), (25.83, 0.462918279), (22.831024799, -1.268540861), (22.831024799, -4.731459139), align=None)
            Polygon((11, -80.537081721), (8.001024799, -82.268540861), (8.001024799, -85.731459139), (11, -87.462918279), (13.998975201, -85.731459139), (13.998975201, -82.268540861), align=None)
            Polygon((44, -28.617081721), (41.001024799, -30.348540861), (41.001024799, -33.811459139), (44, -35.542918279), (46.998975201, -33.811459139), (46.998975201, -30.348540861), align=None)
        extrude(amount=-CUT_EXTRUDE_8_DEPTH, mode=Mode.SUBTRACT)

    # 草图29 → 凸台-拉伸17 (add)
    with SkipClean():  # the faces are left unmerged after this step: merging them gives an invalid solid
        with BuildSketch(Plane.XY.offset(90)):
            with Locations((25, 19)):
                Rectangle(SKETCH_29_W, SKETCH_29_H)
        extrude(amount=EXTRUDE_17_DEPTH)

    # 圆角1
    fillet_1_edges = [part.edges().sort_by_distance(p)[0] for p in [
        (0, 19, -3),
        (50, 19, -3),
        (0, 19, 93),
        (50, 19, 93),
    ]]
    fillet(fillet_1_edges, radius=FILLET_1_R - 0.0001)  # a hair under: the kernel refuses the full size

    # 草图30 → 切除-拉伸9 (cut, through all)
    with BuildSketch(Plane(origin=(50, 0, 0), x_dir=(0, 0, -1), z_dir=(1, 0, 0))):
        with Locations((-45, 10.5)):
            Rectangle(SKETCH_30_W, SKETCH_30_H)
    extrude(amount=-CUT_EXTRUDE_9_DEPTH, mode=Mode.SUBTRACT)


with BuildPart() as cut_extrude_9_piece_1:
    # of the separate pieces the step leaves, piece 1, a body of its own (cut_extrude_9_pieces)
    add(part.part.solids().sort_by_distance((47.0001, 38, -3))[0])


with BuildPart() as cut_extrude_9_piece_2:
    # of the separate pieces the step leaves, piece 2, a body of its own (cut_extrude_9_pieces)
    add(part.part.solids().sort_by_distance((47.0001, 0, -3))[0])


solid = Compound([cut_extrude_9_piece_1.part, cut_extrude_9_piece_2.part])
